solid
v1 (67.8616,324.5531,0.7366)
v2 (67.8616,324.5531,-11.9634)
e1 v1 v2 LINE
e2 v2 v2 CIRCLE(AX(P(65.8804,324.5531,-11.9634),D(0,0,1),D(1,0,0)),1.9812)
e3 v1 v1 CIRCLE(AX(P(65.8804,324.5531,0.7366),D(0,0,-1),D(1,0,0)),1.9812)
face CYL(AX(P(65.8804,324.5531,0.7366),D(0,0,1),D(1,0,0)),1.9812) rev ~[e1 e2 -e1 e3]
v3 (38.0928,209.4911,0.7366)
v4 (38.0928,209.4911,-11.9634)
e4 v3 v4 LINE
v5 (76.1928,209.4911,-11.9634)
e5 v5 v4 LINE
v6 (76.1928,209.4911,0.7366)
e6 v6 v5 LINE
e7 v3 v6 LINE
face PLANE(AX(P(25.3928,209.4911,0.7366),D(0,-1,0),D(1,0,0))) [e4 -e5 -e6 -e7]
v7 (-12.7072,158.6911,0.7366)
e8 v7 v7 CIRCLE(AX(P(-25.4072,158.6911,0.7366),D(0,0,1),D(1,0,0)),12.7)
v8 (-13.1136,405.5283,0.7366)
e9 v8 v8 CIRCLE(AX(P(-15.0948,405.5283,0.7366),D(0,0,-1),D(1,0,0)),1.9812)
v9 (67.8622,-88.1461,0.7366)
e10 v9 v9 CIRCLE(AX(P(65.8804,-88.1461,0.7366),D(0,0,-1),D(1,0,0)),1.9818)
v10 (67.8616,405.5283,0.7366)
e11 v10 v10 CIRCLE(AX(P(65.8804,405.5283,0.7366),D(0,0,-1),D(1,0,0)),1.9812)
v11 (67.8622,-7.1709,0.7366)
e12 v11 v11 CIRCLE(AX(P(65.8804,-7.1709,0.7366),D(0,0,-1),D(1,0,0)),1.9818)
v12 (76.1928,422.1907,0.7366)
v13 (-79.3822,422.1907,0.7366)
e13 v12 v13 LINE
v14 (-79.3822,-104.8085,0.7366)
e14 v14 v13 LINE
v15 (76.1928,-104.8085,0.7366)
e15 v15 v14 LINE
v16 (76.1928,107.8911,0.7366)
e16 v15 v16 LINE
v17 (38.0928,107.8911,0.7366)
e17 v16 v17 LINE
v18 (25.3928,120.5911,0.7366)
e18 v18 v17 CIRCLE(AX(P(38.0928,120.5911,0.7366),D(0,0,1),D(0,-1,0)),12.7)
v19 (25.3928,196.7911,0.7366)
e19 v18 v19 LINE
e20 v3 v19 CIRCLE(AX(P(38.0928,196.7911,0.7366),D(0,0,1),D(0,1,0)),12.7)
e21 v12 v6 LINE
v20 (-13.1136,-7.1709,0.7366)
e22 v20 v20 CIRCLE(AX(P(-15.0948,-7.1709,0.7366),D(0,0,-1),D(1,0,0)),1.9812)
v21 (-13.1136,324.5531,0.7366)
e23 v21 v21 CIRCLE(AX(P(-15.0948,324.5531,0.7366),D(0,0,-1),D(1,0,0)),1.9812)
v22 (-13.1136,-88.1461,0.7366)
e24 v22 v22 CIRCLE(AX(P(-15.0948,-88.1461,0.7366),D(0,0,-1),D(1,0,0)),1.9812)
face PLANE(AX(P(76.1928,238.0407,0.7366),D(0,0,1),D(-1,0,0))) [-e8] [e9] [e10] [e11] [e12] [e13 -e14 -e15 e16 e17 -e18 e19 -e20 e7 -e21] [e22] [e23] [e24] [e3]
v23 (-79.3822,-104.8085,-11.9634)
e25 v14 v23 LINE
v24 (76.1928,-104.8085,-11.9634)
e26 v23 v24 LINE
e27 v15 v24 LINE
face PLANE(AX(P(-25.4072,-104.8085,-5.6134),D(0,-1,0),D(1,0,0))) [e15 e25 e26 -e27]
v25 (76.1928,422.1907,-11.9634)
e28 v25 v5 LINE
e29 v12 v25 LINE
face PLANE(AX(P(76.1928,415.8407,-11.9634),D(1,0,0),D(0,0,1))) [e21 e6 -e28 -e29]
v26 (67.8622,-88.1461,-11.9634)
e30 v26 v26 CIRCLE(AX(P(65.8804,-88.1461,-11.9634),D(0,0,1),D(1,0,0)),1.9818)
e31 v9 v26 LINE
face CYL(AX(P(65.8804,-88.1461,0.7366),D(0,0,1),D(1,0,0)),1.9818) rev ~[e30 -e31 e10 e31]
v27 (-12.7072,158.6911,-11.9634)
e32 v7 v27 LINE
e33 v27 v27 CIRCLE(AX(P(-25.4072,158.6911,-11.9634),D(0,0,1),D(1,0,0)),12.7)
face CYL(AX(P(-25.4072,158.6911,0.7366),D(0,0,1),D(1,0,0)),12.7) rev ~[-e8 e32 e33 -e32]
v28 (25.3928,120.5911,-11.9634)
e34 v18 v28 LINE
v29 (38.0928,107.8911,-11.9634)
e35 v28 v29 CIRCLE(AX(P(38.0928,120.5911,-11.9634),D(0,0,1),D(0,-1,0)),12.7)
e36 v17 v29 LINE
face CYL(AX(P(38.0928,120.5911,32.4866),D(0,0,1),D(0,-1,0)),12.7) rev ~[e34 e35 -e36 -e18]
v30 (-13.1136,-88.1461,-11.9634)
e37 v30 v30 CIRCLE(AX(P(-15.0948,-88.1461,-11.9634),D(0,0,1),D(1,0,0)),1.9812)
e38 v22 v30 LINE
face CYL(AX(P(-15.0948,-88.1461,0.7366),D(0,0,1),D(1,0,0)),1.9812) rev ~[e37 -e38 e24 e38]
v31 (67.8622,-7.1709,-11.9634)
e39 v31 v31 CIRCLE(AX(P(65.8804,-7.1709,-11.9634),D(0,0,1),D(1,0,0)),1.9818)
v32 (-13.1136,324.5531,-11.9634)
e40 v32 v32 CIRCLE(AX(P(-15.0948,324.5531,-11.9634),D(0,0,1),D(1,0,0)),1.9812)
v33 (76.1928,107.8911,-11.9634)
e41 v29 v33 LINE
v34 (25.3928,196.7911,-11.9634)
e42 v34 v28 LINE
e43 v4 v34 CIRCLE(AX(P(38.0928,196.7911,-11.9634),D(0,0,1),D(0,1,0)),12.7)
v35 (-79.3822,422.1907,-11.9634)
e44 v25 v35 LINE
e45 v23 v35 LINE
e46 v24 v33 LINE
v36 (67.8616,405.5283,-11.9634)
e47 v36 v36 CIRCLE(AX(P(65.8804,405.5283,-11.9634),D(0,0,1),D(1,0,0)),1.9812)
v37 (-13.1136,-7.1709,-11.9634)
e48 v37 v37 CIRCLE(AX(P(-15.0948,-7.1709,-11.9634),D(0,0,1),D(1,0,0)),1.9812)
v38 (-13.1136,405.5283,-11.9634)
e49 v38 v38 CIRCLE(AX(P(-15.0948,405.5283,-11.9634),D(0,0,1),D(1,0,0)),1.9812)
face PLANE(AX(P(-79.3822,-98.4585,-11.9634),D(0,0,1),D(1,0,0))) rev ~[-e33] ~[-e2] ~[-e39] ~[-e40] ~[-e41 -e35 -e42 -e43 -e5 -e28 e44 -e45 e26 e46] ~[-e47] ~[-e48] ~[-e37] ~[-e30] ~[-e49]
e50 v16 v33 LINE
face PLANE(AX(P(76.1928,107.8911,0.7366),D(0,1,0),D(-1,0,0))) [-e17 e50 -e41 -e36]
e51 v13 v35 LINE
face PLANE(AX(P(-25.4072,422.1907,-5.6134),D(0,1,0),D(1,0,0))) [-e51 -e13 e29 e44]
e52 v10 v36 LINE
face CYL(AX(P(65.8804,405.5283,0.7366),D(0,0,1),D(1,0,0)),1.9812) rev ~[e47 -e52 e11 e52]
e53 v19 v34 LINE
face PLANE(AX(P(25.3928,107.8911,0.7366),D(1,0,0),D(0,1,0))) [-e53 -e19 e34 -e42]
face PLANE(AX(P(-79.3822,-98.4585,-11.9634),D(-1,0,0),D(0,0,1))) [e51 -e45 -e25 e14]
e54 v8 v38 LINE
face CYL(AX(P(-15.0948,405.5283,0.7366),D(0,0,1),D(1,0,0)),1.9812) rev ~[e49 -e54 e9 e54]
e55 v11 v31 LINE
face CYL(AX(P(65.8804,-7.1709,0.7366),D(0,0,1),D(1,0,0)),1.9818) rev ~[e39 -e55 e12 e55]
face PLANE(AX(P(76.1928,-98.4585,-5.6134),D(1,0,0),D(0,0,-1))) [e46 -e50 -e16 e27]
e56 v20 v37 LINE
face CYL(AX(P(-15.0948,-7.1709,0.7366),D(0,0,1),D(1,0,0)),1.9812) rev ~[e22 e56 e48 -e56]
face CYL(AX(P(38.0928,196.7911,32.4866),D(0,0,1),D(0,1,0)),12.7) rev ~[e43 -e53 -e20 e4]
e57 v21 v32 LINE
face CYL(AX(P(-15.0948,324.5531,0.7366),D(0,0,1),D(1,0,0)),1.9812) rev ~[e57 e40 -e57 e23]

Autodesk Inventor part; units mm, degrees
ref_plane "YZ Plane" through (0, 0, 0) normal (1, 0, 0) x (0, 1, 0)
ref_plane "XZ Plane" through (0, 0, 0) normal (0, 1, 0) x (-1, 0, 0)
ref_plane "XY Plane" through (0, 0, 0) normal (0, 0, 1) x (1, 0, 0)
sketch "Sketch1" plane through (0, 0, 0) normal (0, 0, 1) x (1, 0, 0)
  line L0 (-25.4072, 25.3665) -> (76.1928, 25.3665)
  line L1 (76.1928, 25.3665) -> (76.1928, -76.2335)
  line L2 (76.1928, -76.2335) -> (-25.4072, -76.2335)
  line L3 (-25.4072, -76.2335) -> (-25.4072, 25.3665)
  point P0 (0, 0)
  dimension "d0" = 101.6
  dimension "d1" = 101.6
extrude "Extrusion1" add sketch "Sketch1" along normal blind 0.7366
sketch "Sketch2" plane through (0, 0, 0.7366) normal (0, 0, 1) x (1, 0, 0)
  line L0 (-25.4072, 25.3665) -> (76.1928, -76.2335)
  line L1 (76.1928, 25.3665) -> (-25.4072, -76.2335)
  circle A0 centre (25.3928, -25.4335) radius 27.432
  point P0 (0, 0)
  dimension "d4" = 54.864
extrude "Extrusion2" cut sketch "Sketch2" against normal blind 0.7366
sketch "Sketch3" plane through (0, 0, 0.7366) normal (0, 0, 1) x (1, 0, 0)
  line L0 (-25.4072, -76.2335) -> (-25.4072, 25.3665) projected
  line L1 (-25.4072, 25.3665) -> (-25.4072, -25.4335)
  line L2 (-25.4072, -25.4335) -> (-25.4072, 19.4102)
  line L3 (-25.4072, 25.3665) -> (76.1928, -76.2335)
  line L4 (76.1928, 25.3665) -> (-25.4072, -76.2335)
  circle A0 centre (-19.4509, 19.4102) radius 1.9812
  point P0 (0, 0)
  dimension "d7" = 44.8437
  dimension "d8" = 3.9624
extrude "Extrusion3" cut sketch "Sketch3" against normal blind 0.7366 contours A0 L3 | L3 A0
sketch "Sketch4" plane through (0, 0, 0.7366) normal (0, 0, 1) x (1, 0, 0)
  line L0 (-25.4072, -76.2335) -> (76.1928, 25.3665)
  line L1 (-25.4072, 25.3665) -> (76.1928, -76.2335)
  circle A0 centre (70.2365, 19.4102) radius 1.9819
  circle A1 centre (70.2365, -70.2772) radius 1.983
  circle A2 centre (-19.4509, -70.2772) radius 1.9812
  point P0 (0, 0)
extrude "Extrusion4" cut sketch "Sketch4" against normal blind 0.7366
sketch "Sketch5" plane through (0, 0, 0.7366) normal (0, 0, 1) x (1, 0, 0)
  circle A0 centre (25.3928, -25.4335) radius 27.432 projected
  circle A1 centre (25.3928, -25.4335) radius 29.972
  circle A2 centre (25.3928, -25.4335) radius 32.512
  point P0 (0, 0)
  dimension "d13" = 59.944
  dimension "d14" = 65.024
extrude "Extrusion5" add sketch "Sketch5" along normal blind 6.6548 contours A2
fillet "Fillet1" radius 3.175 4 edges at (-25.4072, 25.3665, 0.3683) (76.1928, 25.3665, 0.3683) (76.1928, -76.2335, 0.3683) (-25.4072, -76.2335, 0.3683)
sketch "Sketch6" plane through (25.3928, -25.4335, 0.7366) normal (0, 0, 1) x (1, 0, 0)
  circle A0 centre (0, 0) radius 29.972 projected
  circle A1 centre (0, 0) radius 27.432 projected
  point P0 (-25.3928, 25.4335)
extrude "Extrusion6" add sketch "Sketch6" along normal blind 9.1948
sketch "Sketch7" plane through (25.3928, -25.4335, 7.3914) normal (0, 0, 1) x (1, 0, 0)
  circle A0 centre (0, 0) radius 29.972 projected
  circle A1 centre (0, 0) radius 32.512 projected
  point P0 (-25.3928, 25.4335)
extrude "Extrusion7" cut sketch "Sketch7" against normal blind 6.6548
sketch "Sketch8" plane through (25.3928, -25.4335, 9.9314) normal (0, 0, 1) x (1, 0, 0)
  circle A0 centre (0, 0) radius 27.432 projected
  circle A1 centre (0, 0) radius 29.972 projected
  point P0 (-25.3928, 25.4335)
extrude "Extrusion8" cut sketch "Sketch8" against normal blind 2.54
sketch "Sketch9" plane through (0, 0, 0.7366) normal (0, 0, 1) x (1, 0, 0)
  circle A0 centre (-19.4509, 19.4102) radius 1.9812 projected
  circle A1 centre (70.2365, -70.2772) radius 1.983 projected
  circle A2 centre (-19.4509, -70.2772) radius 1.9812 projected
  circle A3 centre (70.2365, 19.4102) radius 1.9819 projected
  point P0 (0, 0)
extrude "Extrusion9" add sketch "Sketch9" against normal blind 0.7366
sketch "Sketch10" plane through (0, 0, 0.7366) normal (0, 0, 1) x (1, 0, 0)
  line L0 (-25.4072, 25.3665) -> (76.1928, 25.3665)
  line L1 (76.1928, 25.3665) -> (76.1928, -76.2335)
  line L2 (76.1928, -76.2335) -> (-25.4072, -76.2335)
  line L3 (-25.4072, -76.2335) -> (-25.4072, 25.3665)
  line L4 (-25.4072, 25.3665) -> (76.1928, -76.2335)
  line L5 (-25.4072, -76.2335) -> (76.1928, 25.3665)
  line L6 (-25.4072, 25.3665) -> (-25.4072, -25.4335)
  line L7 (-25.4072, -25.4335) -> (-25.4072, 15.0541)
  circle A0 centre (-15.0948, 15.0541) radius 1.9812
  circle A1 centre (65.8804, 15.0541) radius 1.9818
  circle A2 centre (65.8804, -65.9211) radius 1.9832
  circle A3 centre (-15.0948, -65.9211) radius 1.9812
  point P0 (0, 0)
  dimension "d26" = 40.4876
  dimension "d27" = 3.9624
extrude "Extrusion10" cut sketch "Sketch10" against normal blind 0.7366 contours A0 L4 | L4 A0 | A1 L5 | L5 A1 | A2 L4 | L4 A2 | A3 L5 | L5 A3
sketch "Sketch11" plane through (0, 0, 0.7366) normal (0, 0, 1) x (1, 0, 0)
  circle A0 centre (-15.0948, 15.0541) radius 1.9812 projected
  circle A1 centre (-15.0948, -65.9211) radius 1.9812 projected
  circle A2 centre (65.8804, 15.0541) radius 1.9818 projected
  circle A3 centre (65.8804, -65.9211) radius 1.9832 projected
  line L0 (-25.4072, 25.3665) -> (76.1928, 25.3665)
  line L1 (76.1928, 25.3665) -> (76.1928, -76.2335)
  line L2 (76.1928, -76.2335) -> (-25.4072, -76.2335)
  line L3 (-25.4072, -76.2335) -> (-25.4072, 25.3665)
  point P0 (0, 0)
extrude "Extrusion11" add sketch "Sketch11" along normal blind 12.7
sketch "Sketch12" plane through (0, 0, 13.4366) normal (0, 0, 1) x (1, 0, 0)
  circle A0 centre (65.8804, -65.9211) radius 1.9832 projected
  circle A1 centre (65.8804, 15.0541) radius 1.9818 projected
  circle A2 centre (-15.0948, 15.0541) radius 1.9812 projected
  circle A3 centre (-15.0948, -65.9211) radius 1.9812 projected
  line L0 (76.1928, 25.3665) -> (76.1928, -76.2335) projected
  line L1 (-25.4072, 25.3665) -> (76.1928, 25.3665) projected
  line L2 (-25.4072, -76.2335) -> (-25.4072, 25.3665) projected
  line L3 (76.1928, -76.2335) -> (-25.4072, -76.2335) projected
  point P0 (0, 0)
extrude "Extrusion12" add sketch "Sketch12" against normal blind 19.05
sketch "Sketch13" plane through (0, 0, 13.4366) normal (0, 0, 1) x (1, 0, 0)
  circle A0 centre (65.8804, -65.9211) radius 1.9832 projected
  circle A1 centre (65.8804, 15.0541) radius 1.9818 projected
  circle A2 centre (-15.0948, 15.0541) radius 1.9812 projected
  circle A3 centre (-15.0948, -65.9211) radius 1.9812 projected
  line L0 (76.1928, 25.3665) -> (76.1928, -76.2335) projected
  line L1 (-25.4072, 25.3665) -> (76.1928, 25.3665) projected
  line L2 (-25.4072, -76.2335) -> (-25.4072, 25.3665) projected
  line L3 (76.1928, -76.2335) -> (-25.4072, -76.2335) projected
  point P0 (0, 0)
extrude "Extrusion13" cut sketch "Sketch13" against normal blind 12.7
sketch "Sketch14" plane through (-25.4072, 25.3665, -5.6134) normal (0, 1, 0) x (1, 0, 0)
  line L0 (0, -6.35) -> (101.6, -6.35) projected
  line L1 (101.6, -6.35) -> (101.6, 0) projected
  line L2 (101.6, 0) -> (0, 0) projected
  line L3 (0, 0) -> (0, -6.35) projected
  point P0 (25.4072, -5.6134)
sketch "Sketch15" plane through (-25.4072, -76.2335, -5.6134) normal (-1, 0, 0) x (0, 0, 1)
  line L0 (6.35, 0) -> (6.35, 101.6) projected
  line L1 (0, 101.6) -> (6.35, 101.6) projected
  line L2 (0, 101.6) -> (0, 0) projected
  line L3 (6.35, 0) -> (0, 0) projected
  point P0 (5.6134, 76.2335)
sketch "Sketch16" plane through (-25.4072, -76.2335, -5.6134) normal (0, -1, 0) x (1, 0, 0)
  line L0 (101.6, 6.35) -> (0, 6.35) projected
  line L1 (0, 6.35) -> (0, 0) projected
  line L2 (0, 0) -> (101.6, 0) projected
  line L3 (101.6, 6.35) -> (101.6, 0) projected
  point P0 (25.4072, 5.6134)
sketch "Sketch17" plane through (76.1928, -76.2335, -5.6134) normal (1, 0, 0) x (0, 0, -1)
  line L0 (-6.35, 101.6) -> (-6.35, 0) projected
  line L1 (-6.35, 0) -> (0, 0) projected
  line L2 (0, 0) -> (0, 101.6) projected
  line L3 (-6.35, 101.6) -> (0, 101.6) projected
  point P0 (-5.6134, 76.2335)
extrude "Extrusion14" add sketch "Sketch14" along normal blind 53.975
extrude "Extrusion15" add sketch "Sketch17" along normal blind 47.625
extrude "Extrusion16" add sketch "Sketch16" along normal blind 47.625
extrude "Extrusion17" add sketch "Sketch15" along normal blind 53.975
sketch "Sketch18" plane through (-25.4072, 25.3665, 0.7366) normal (0, 1, 0) x (1, 0, 0)
  line L0 (-53.975, 6.35) -> (-53.975, 0) projected
  line L1 (0, 0) -> (-53.975, 0) projected
  line L2 (0, 6.35) -> (0, 0) projected
  line L3 (0, 6.35) -> (-53.975, 6.35) projected
  point P0 (25.4072, 0.7366)
extrude "Extrusion18" add sketch "Sketch18" along normal blind 53.975
sketch "Sketch19" plane through (76.1928, 25.3665, 0.7366) normal (0, 1, 0) x (1, 0, 0)
  line L0 (47.625, 0) -> (47.625, 6.35) projected
  line L1 (0, 6.35) -> (47.625, 6.35) projected
  line L2 (0, 0) -> (0, 6.35) projected
  line L3 (0, 0) -> (47.625, 0) projected
  point P0 (-76.1928, 0.7366)
extrude "Extrusion19" add sketch "Sketch19" along normal blind 53.975
sketch "Sketch20" plane through (-25.4072, -123.8585, -5.6134) normal (-1, 0, 0) x (0, 0, 1)
  line L0 (6.35, 47.625) -> (0, 47.625) projected
  line L1 (0, 47.625) -> (0, 0) projected
  line L2 (0, 0) -> (6.35, 0) projected
  line L3 (6.35, 0) -> (6.35, 47.625) projected
  point P0 (5.6134, 123.8585)
extrude "Extrusion20" add sketch "Sketch20" along normal blind 53.975
sketch "Sketch21" plane through (123.8178, -76.2335, -5.6134) normal (0, -1, 0) x (1, 0, 0)
  line L0 (-47.625, 6.35) -> (-47.625, 0) projected
  line L1 (-47.625, 0) -> (0, 0) projected
  line L2 (0, 0) -> (0, 6.35) projected
  line L3 (0, 6.35) -> (-47.625, 6.35) projected
  point P0 (-123.8178, 5.6134)
extrude "Extrusion21" add sketch "Sketch21" along normal blind 47.625
sketch "Sketch22" plane through (-25.4072, 79.3415, -5.6134) normal (0, 1, 0) x (1, 0, 0)
  line L0 (149.225, -6.35) -> (-53.975, -6.35) projected
  line L1 (149.225, 0) -> (149.225, -6.35) projected
  line L2 (-53.975, 0) -> (149.225, 0) projected
  line L3 (-53.975, -6.35) -> (-53.975, 0) projected
  point P0 (25.4072, -5.6134)
extrude "Extrusion22" cut sketch "Sketch22" against normal blind 53.975
sketch "Sketch23" plane through (-79.3822, -76.2335, -5.6134) normal (-1, 0, 0) x (0, 0, 1)
  line L0 (6.35, 101.6) -> (0, 101.6) projected
  line L1 (0, -47.625) -> (0, 101.6) projected
  line L2 (6.35, -47.625) -> (0, -47.625) projected
  line L3 (6.35, 101.6) -> (6.35, -47.625) projected
  point P0 (5.6134, 76.2335)
extrude "Extrusion23" cut sketch "Sketch23" against normal blind 53.975
sketch "Sketch24" plane through (-25.4072, -123.8585, -5.6134) normal (0, -1, 0) x (1, 0, 0)
  line L0 (0, 6.35) -> (0, 0) projected
  line L1 (149.225, 0) -> (0, 0) projected
  line L2 (149.225, 6.35) -> (149.225, 0) projected
  line L3 (0, 6.35) -> (149.225, 6.35) projected
  point P0 (25.4072, 5.6134)
extrude "Extrusion24" cut sketch "Sketch24" against normal blind 47.625
sketch "Sketch25" plane through (123.8178, -76.2335, -5.6134) normal (1, 0, 0) x (0, 0, -1)
  line L0 (-6.35, 0) -> (0, 0) projected
  line L1 (0, 101.6) -> (0, 0) projected
  line L2 (0, 101.6) -> (-6.35, 101.6) projected
  line L3 (-6.35, 0) -> (-6.35, 101.6) projected
  point P0 (-5.6134, 76.2335)
extrude "Extrusion25" cut sketch "Sketch25" against normal blind 47.625
sketch "Sketch26" plane through (-25.4072, 25.3665, -5.6134) normal (0, 1, 0) x (1, 0, 0)
  line L0 (101.6, -6.35) -> (101.6, 0) projected
  line L1 (0, 0) -> (101.6, 0) projected
  line L2 (0, 0) -> (0, -6.35) projected
  line L3 (101.6, -6.35) -> (0, -6.35) projected
  point P0 (25.4072, -5.6134)
extrude "Extrusion26" add sketch "Sketch26" along normal blind 53.975
sketch "Sketch27" plane through (-25.4072, -76.2335, -5.6134) normal (-1, 0, 0) x (0, 0, 1)
  line L0 (0, 0) -> (6.35, 0) projected
  line L1 (6.35, 0) -> (6.35, 155.575) projected
  line L2 (6.35, 155.575) -> (0, 155.575) projected
  line L3 (0, 0) -> (0, 155.575) projected
  point P0 (5.6134, 76.2335)
extrude "Extrusion27" add sketch "Sketch27" along normal blind 53.975
sketch "Sketch28" plane through (-25.4072, -76.2335, -5.6134) normal (0, -1, 0) x (1, 0, 0)
  line L0 (101.6, 0) -> (101.6, 6.35) projected
  line L1 (101.6, 6.35) -> (-53.975, 6.35) projected
  line L2 (-53.975, 6.35) -> (-53.975, 0) projected
  line L3 (101.6, 0) -> (-53.975, 0) projected
  point P0 (25.4072, 5.6134)
extrude "Extrusion28" add sketch "Sketch28" along normal blind 22.225
sketch "Sketch29" plane through (-25.4072, 79.3415, -5.6134) normal (0, 1, 0) x (1, 0, 0)
  line L0 (101.6, -6.35) -> (-53.975, -6.35) projected
  line L1 (101.6, 0) -> (101.6, -6.35) projected
  line L2 (-53.975, 0) -> (101.6, 0) projected
  line L3 (-53.975, 0) -> (-53.975, -6.35) projected
  point P0 (25.4072, -5.6134)
extrude "Extrusion29" add sketch "Sketch29" along normal blind 158.6992
sketch "Sketch30" plane through (-25.4072, 238.0407, -5.6134) normal (0, 1, 0) x (1, 0, 0)
  line L0 (-53.975, -6.35) -> (-53.975, 0) projected
  line L1 (101.6, -6.35) -> (-53.975, -6.35) projected
  line L2 (101.6, 0) -> (101.6, -6.35) projected
  line L3 (-53.975, 0) -> (101.6, 0) projected
  point P0 (25.4072, -5.6134)
extrude "Extrusion30" add sketch "Sketch30" along normal blind 177.8
sketch "Sketch31" plane through (0, 0, 0.7366) normal (0, 0, 1) x (1, 0, 0)
  line L0 (76.1928, 415.8407) -> (76.1928, -98.4585) projected
  line L1 (76.1928, 415.8407) -> (-79.3822, 415.8407) projected
  line L2 (65.8804, 415.8407) -> (65.8804, 383.3033)
  line L3 (65.8804, 383.3033) -> (-17.076, 383.3033)
  line L4 (-17.076, 383.3033) -> (-13.1136, 383.3033)
  line L5 (-13.1136, 383.3033) -> (-15.0948, 383.3033)
  circle A0 centre (-15.0948, 383.3033) radius 1.9812
  circle A1 centre (65.8804, 383.3033) radius 1.9812
  line L6 (65.8804, 383.3033) -> (65.8804, 302.3281)
  circle A2 centre (65.8804, 302.3281) radius 1.9812
  line L7 (-15.0948, 383.3033) -> (-15.0948, 302.3281)
  circle A3 centre (-15.0948, 302.3281) radius 1.9812
  point P0 (0, 0)
  dimension "d70" = 32.5374
  dimension "d71" = 80.9752
extrude "Extrusion31" cut sketch "Sketch31" against normal blind 177.8
sketch "Sketch32" plane through (0, 0, -5.6134) normal (0, 0, -1) x (-1, 0, 0)
  circle A0 centre (15.0948, 383.3033) radius 1.9812 projected
  circle A1 centre (15.0948, 302.3281) radius 1.9812 projected
  circle A2 centre (-65.8804, 302.3281) radius 1.9812 projected
  circle A3 centre (-65.8804, 383.3033) radius 1.9812 projected
  circle A4 centre (15.0948, -65.9211) radius 1.9812 projected
  circle A5 centre (15.0948, 15.0541) radius 1.9812 projected
  circle A6 centre (-65.8804, 15.0541) radius 1.9818 projected
  circle A7 centre (-65.8804, -65.9211) radius 1.9832 projected
  line L0 (-76.1928, 415.8407) -> (-76.1928, -98.4585) projected
  line L1 (-76.1928, -98.4585) -> (79.3822, -98.4585) projected
  line L2 (79.3822, -98.4585) -> (79.3822, 415.8407) projected
  line L3 (79.3822, 415.8407) -> (-76.1928, 415.8407) projected
  point P0 (0, 0)
extrude "Extrusion32" add sketch "Sketch32" along normal blind 6.35
sketch "Sketch33" plane through (0, 0, 0.7366) normal (0, 0, 1) x (1, 0, 0)
  line L0 (76.1928, 415.8407) -> (76.1928, -98.4585) projected
  line L1 (76.1928, 158.6911) -> (76.1928, 107.8911)
  line L2 (76.1928, 107.8911) -> (25.3928, 107.8911)
  line L3 (25.3928, 107.8911) -> (25.3928, 209.4911)
  line L4 (25.3928, 209.4911) -> (76.1928, 209.4911)
  line L5 (76.1928, 209.4911) -> (76.1928, 107.8911)
  point P0 (0, 0)
  dimension "d76" = 50.8
  dimension "d77" = 50.8
  dimension "d78" = 101.6
extrude "Extrusion33" cut sketch "Sketch33" against normal blind 25.4
sketch "Sketch34" plane through (0, 0, 0.7366) normal (0, 0, 1) x (1, 0, 0)
  line L0 (25.3928, 107.8911) -> (25.3928, 209.4911) projected
  line L1 (76.1928, 107.8911) -> (76.1928, -98.4585) projected
  line L2 (25.3928, 158.6911) -> (-25.4072, 158.6911)
  circle A0 centre (-25.4072, 158.6911) radius 12.7
  point P0 (0, 0)
  dimension "d81" = 50.8
  dimension "d82" = 25.4
extrude "Extrusion34" cut sketch "Sketch34" against normal blind 25.4
fillet "Fillet2" radius 12.7 2 edges at (25.3928, 209.4911, -5.6134) (25.3928, 107.8911, -5.6134)
sketch "Sketch35" plane through (0, 0, 0.7366) normal (0, 0, 1) x (1, 0, 0)
  line L0 (-79.3822, 415.8407) -> (76.1928, 415.8407)
  line L1 (76.1928, 415.8407) -> (76.1928, 422.1907)
  line L2 (76.1928, 422.1907) -> (-79.3822, 422.1907)
  line L3 (-79.3822, 422.1907) -> (-79.3822, 415.8407)
  line L4 (-79.3822, -98.4585) -> (76.1928, -98.4585)
  line L5 (76.1928, -98.4585) -> (76.1928, -104.8085)
  line L6 (76.1928, -104.8085) -> (-79.3822, -104.8085)
  line L7 (-79.3822, -104.8085) -> (-79.3822, -98.4585)
  point P0 (0, 0)
  dimension "d86" = 6.35
  dimension "d87" = 6.35
extrude "Extrusion35" add sketch "Sketch35" against normal blind 6.35
sketch "Sketch36" plane through (-25.4072, 415.8407, -5.6134) normal (0, 1, 0) x (1, 0, 0)
  line L0 (-53.975, 0) -> (101.6, 0) projected
  line L1 (101.6, 6.35) -> (101.6, 0) projected
  line L2 (101.6, 6.35) -> (-53.975, 6.35) projected
  line L3 (-53.975, 0) -> (-53.975, 6.35) projected
  point P0 (25.4072, -5.6134)
extrude "Extrusion36" add sketch "Sketch36" along normal blind 6.35
sketch "Sketch37" plane through (-25.4072, -98.4585, -5.6134) normal (0, -1, 0) x (1, 0, 0)
  line L0 (101.6, 0) -> (-53.975, 0) projected
  line L1 (-53.975, -6.35) -> (-53.975, 0) projected
  line L2 (-53.975, -6.35) -> (101.6, -6.35) projected
  line L3 (101.6, 0) -> (101.6, -6.35) projected
  point P0 (25.4072, 5.6134)
extrude "Extrusion37" add sketch "Sketch37" along normal blind 6.35
sketch "Sketch38" plane through (0, 0, 0.7366) normal (0, 0, 1) x (1, 0, 0)
  line L0 (76.1928, 422.1907) -> (-79.3822, 422.1907) projected
  line L1 (76.1928, 107.8911) -> (76.1928, -104.8085) projected
  circle A0 centre (65.8804, 302.3281) radius 1.9812 projected
  circle A1 centre (-15.0948, 302.3281) radius 1.9812 projected
  line L2 (-15.0948, 422.1907) -> (-15.0948, 405.5283)
  line L3 (-15.0948, 405.5283) -> (65.8804, 405.5283)
  line L4 (65.8804, 302.3281) -> (65.8804, 324.5531)
  line L5 (-15.0948, 302.3281) -> (-15.0948, 324.5531)
  circle A2 centre (-15.0948, 324.5531) radius 1.9812
  circle A3 centre (-15.0948, 405.5283) radius 1.9812
  circle A4 centre (65.8804, 405.5283) radius 1.9812
  circle A5 centre (65.8804, 324.5531) radius 1.9812
  point P0 (0, 0)
  dimension "d94" = 16.6624
  dimension "d95" = 22.225
extrude "Extrusion38" cut sketch "Sketch38" against normal blind 12.7 contours A3 L3 L2 | L2 L3 A3 | A2 | A4 | A5
sketch "Sketch39" plane through (0, 0, 0.7366) normal (0, 0, 1) x (1, 0, 0)
  circle A0 centre (65.8804, 383.3033) radius 1.9812 projected
  circle A1 centre (65.8804, 302.3281) radius 1.9812 projected
  circle A2 centre (-15.0948, 302.3281) radius 1.9812 projected
  circle A3 centre (-15.0948, 383.3033) radius 1.9812 projected
  point P0 (0, 0)
extrude "Extrusion39" add sketch "Sketch39" against normal blind 12.7
sketch "Sketch40" plane through (0, 0, 0.7366) normal (0, 0, 1) x (1, 0, 0)
  circle A0 centre (-15.0948, 15.0541) radius 1.9812 projected
  circle A1 centre (-15.0948, -65.9211) radius 1.9812 projected
  line L0 (76.1928, 107.8911) -> (76.1928, -104.8085) projected
  line L1 (-15.0948, -65.9211) -> (-15.0948, -88.1461)
  line L2 (-15.0948, -88.1461) -> (65.8804, -88.1461)
  line L3 (-15.0948, 15.0541) -> (-15.0948, -7.1709)
  line L4 (-15.0948, -7.1709) -> (65.8804, -7.1709)
  circle A2 centre (-15.0948, -88.1461) radius 1.9812
  circle A3 centre (65.8804, -88.1461) radius 1.9818
  circle A4 centre (65.8804, -7.1709) radius 1.9818
  circle A5 centre (-15.0948, -7.1709) radius 1.9812
  point P0 (0, 0)
  dimension "d100" = 22.225
  dimension "d101" = 22.225
extrude "Extrusion40" cut sketch "Sketch40" against normal blind 12.7 contours A2 L2 L1 | L1 L2 A2 | A5 L4 L3 | L3 L4 A5 | A3 | A4
sketch "Sketch41" plane through (0, 0, 0.7366) normal (0, 0, 1) x (1, 0, 0)
  circle A0 centre (65.8804, -65.9211) radius 1.9832 projected
  circle A1 centre (65.8804, 15.0541) radius 1.9818 projected
  circle A2 centre (-15.0948, 15.0541) radius 1.9812 projected
  circle A3 centre (-15.0948, -65.9211) radius 1.9812 projected
  point P0 (0, 0)
extrude "Extrusion41" add sketch "Sketch41" against normal blind 12.7
properties part number "holder"
